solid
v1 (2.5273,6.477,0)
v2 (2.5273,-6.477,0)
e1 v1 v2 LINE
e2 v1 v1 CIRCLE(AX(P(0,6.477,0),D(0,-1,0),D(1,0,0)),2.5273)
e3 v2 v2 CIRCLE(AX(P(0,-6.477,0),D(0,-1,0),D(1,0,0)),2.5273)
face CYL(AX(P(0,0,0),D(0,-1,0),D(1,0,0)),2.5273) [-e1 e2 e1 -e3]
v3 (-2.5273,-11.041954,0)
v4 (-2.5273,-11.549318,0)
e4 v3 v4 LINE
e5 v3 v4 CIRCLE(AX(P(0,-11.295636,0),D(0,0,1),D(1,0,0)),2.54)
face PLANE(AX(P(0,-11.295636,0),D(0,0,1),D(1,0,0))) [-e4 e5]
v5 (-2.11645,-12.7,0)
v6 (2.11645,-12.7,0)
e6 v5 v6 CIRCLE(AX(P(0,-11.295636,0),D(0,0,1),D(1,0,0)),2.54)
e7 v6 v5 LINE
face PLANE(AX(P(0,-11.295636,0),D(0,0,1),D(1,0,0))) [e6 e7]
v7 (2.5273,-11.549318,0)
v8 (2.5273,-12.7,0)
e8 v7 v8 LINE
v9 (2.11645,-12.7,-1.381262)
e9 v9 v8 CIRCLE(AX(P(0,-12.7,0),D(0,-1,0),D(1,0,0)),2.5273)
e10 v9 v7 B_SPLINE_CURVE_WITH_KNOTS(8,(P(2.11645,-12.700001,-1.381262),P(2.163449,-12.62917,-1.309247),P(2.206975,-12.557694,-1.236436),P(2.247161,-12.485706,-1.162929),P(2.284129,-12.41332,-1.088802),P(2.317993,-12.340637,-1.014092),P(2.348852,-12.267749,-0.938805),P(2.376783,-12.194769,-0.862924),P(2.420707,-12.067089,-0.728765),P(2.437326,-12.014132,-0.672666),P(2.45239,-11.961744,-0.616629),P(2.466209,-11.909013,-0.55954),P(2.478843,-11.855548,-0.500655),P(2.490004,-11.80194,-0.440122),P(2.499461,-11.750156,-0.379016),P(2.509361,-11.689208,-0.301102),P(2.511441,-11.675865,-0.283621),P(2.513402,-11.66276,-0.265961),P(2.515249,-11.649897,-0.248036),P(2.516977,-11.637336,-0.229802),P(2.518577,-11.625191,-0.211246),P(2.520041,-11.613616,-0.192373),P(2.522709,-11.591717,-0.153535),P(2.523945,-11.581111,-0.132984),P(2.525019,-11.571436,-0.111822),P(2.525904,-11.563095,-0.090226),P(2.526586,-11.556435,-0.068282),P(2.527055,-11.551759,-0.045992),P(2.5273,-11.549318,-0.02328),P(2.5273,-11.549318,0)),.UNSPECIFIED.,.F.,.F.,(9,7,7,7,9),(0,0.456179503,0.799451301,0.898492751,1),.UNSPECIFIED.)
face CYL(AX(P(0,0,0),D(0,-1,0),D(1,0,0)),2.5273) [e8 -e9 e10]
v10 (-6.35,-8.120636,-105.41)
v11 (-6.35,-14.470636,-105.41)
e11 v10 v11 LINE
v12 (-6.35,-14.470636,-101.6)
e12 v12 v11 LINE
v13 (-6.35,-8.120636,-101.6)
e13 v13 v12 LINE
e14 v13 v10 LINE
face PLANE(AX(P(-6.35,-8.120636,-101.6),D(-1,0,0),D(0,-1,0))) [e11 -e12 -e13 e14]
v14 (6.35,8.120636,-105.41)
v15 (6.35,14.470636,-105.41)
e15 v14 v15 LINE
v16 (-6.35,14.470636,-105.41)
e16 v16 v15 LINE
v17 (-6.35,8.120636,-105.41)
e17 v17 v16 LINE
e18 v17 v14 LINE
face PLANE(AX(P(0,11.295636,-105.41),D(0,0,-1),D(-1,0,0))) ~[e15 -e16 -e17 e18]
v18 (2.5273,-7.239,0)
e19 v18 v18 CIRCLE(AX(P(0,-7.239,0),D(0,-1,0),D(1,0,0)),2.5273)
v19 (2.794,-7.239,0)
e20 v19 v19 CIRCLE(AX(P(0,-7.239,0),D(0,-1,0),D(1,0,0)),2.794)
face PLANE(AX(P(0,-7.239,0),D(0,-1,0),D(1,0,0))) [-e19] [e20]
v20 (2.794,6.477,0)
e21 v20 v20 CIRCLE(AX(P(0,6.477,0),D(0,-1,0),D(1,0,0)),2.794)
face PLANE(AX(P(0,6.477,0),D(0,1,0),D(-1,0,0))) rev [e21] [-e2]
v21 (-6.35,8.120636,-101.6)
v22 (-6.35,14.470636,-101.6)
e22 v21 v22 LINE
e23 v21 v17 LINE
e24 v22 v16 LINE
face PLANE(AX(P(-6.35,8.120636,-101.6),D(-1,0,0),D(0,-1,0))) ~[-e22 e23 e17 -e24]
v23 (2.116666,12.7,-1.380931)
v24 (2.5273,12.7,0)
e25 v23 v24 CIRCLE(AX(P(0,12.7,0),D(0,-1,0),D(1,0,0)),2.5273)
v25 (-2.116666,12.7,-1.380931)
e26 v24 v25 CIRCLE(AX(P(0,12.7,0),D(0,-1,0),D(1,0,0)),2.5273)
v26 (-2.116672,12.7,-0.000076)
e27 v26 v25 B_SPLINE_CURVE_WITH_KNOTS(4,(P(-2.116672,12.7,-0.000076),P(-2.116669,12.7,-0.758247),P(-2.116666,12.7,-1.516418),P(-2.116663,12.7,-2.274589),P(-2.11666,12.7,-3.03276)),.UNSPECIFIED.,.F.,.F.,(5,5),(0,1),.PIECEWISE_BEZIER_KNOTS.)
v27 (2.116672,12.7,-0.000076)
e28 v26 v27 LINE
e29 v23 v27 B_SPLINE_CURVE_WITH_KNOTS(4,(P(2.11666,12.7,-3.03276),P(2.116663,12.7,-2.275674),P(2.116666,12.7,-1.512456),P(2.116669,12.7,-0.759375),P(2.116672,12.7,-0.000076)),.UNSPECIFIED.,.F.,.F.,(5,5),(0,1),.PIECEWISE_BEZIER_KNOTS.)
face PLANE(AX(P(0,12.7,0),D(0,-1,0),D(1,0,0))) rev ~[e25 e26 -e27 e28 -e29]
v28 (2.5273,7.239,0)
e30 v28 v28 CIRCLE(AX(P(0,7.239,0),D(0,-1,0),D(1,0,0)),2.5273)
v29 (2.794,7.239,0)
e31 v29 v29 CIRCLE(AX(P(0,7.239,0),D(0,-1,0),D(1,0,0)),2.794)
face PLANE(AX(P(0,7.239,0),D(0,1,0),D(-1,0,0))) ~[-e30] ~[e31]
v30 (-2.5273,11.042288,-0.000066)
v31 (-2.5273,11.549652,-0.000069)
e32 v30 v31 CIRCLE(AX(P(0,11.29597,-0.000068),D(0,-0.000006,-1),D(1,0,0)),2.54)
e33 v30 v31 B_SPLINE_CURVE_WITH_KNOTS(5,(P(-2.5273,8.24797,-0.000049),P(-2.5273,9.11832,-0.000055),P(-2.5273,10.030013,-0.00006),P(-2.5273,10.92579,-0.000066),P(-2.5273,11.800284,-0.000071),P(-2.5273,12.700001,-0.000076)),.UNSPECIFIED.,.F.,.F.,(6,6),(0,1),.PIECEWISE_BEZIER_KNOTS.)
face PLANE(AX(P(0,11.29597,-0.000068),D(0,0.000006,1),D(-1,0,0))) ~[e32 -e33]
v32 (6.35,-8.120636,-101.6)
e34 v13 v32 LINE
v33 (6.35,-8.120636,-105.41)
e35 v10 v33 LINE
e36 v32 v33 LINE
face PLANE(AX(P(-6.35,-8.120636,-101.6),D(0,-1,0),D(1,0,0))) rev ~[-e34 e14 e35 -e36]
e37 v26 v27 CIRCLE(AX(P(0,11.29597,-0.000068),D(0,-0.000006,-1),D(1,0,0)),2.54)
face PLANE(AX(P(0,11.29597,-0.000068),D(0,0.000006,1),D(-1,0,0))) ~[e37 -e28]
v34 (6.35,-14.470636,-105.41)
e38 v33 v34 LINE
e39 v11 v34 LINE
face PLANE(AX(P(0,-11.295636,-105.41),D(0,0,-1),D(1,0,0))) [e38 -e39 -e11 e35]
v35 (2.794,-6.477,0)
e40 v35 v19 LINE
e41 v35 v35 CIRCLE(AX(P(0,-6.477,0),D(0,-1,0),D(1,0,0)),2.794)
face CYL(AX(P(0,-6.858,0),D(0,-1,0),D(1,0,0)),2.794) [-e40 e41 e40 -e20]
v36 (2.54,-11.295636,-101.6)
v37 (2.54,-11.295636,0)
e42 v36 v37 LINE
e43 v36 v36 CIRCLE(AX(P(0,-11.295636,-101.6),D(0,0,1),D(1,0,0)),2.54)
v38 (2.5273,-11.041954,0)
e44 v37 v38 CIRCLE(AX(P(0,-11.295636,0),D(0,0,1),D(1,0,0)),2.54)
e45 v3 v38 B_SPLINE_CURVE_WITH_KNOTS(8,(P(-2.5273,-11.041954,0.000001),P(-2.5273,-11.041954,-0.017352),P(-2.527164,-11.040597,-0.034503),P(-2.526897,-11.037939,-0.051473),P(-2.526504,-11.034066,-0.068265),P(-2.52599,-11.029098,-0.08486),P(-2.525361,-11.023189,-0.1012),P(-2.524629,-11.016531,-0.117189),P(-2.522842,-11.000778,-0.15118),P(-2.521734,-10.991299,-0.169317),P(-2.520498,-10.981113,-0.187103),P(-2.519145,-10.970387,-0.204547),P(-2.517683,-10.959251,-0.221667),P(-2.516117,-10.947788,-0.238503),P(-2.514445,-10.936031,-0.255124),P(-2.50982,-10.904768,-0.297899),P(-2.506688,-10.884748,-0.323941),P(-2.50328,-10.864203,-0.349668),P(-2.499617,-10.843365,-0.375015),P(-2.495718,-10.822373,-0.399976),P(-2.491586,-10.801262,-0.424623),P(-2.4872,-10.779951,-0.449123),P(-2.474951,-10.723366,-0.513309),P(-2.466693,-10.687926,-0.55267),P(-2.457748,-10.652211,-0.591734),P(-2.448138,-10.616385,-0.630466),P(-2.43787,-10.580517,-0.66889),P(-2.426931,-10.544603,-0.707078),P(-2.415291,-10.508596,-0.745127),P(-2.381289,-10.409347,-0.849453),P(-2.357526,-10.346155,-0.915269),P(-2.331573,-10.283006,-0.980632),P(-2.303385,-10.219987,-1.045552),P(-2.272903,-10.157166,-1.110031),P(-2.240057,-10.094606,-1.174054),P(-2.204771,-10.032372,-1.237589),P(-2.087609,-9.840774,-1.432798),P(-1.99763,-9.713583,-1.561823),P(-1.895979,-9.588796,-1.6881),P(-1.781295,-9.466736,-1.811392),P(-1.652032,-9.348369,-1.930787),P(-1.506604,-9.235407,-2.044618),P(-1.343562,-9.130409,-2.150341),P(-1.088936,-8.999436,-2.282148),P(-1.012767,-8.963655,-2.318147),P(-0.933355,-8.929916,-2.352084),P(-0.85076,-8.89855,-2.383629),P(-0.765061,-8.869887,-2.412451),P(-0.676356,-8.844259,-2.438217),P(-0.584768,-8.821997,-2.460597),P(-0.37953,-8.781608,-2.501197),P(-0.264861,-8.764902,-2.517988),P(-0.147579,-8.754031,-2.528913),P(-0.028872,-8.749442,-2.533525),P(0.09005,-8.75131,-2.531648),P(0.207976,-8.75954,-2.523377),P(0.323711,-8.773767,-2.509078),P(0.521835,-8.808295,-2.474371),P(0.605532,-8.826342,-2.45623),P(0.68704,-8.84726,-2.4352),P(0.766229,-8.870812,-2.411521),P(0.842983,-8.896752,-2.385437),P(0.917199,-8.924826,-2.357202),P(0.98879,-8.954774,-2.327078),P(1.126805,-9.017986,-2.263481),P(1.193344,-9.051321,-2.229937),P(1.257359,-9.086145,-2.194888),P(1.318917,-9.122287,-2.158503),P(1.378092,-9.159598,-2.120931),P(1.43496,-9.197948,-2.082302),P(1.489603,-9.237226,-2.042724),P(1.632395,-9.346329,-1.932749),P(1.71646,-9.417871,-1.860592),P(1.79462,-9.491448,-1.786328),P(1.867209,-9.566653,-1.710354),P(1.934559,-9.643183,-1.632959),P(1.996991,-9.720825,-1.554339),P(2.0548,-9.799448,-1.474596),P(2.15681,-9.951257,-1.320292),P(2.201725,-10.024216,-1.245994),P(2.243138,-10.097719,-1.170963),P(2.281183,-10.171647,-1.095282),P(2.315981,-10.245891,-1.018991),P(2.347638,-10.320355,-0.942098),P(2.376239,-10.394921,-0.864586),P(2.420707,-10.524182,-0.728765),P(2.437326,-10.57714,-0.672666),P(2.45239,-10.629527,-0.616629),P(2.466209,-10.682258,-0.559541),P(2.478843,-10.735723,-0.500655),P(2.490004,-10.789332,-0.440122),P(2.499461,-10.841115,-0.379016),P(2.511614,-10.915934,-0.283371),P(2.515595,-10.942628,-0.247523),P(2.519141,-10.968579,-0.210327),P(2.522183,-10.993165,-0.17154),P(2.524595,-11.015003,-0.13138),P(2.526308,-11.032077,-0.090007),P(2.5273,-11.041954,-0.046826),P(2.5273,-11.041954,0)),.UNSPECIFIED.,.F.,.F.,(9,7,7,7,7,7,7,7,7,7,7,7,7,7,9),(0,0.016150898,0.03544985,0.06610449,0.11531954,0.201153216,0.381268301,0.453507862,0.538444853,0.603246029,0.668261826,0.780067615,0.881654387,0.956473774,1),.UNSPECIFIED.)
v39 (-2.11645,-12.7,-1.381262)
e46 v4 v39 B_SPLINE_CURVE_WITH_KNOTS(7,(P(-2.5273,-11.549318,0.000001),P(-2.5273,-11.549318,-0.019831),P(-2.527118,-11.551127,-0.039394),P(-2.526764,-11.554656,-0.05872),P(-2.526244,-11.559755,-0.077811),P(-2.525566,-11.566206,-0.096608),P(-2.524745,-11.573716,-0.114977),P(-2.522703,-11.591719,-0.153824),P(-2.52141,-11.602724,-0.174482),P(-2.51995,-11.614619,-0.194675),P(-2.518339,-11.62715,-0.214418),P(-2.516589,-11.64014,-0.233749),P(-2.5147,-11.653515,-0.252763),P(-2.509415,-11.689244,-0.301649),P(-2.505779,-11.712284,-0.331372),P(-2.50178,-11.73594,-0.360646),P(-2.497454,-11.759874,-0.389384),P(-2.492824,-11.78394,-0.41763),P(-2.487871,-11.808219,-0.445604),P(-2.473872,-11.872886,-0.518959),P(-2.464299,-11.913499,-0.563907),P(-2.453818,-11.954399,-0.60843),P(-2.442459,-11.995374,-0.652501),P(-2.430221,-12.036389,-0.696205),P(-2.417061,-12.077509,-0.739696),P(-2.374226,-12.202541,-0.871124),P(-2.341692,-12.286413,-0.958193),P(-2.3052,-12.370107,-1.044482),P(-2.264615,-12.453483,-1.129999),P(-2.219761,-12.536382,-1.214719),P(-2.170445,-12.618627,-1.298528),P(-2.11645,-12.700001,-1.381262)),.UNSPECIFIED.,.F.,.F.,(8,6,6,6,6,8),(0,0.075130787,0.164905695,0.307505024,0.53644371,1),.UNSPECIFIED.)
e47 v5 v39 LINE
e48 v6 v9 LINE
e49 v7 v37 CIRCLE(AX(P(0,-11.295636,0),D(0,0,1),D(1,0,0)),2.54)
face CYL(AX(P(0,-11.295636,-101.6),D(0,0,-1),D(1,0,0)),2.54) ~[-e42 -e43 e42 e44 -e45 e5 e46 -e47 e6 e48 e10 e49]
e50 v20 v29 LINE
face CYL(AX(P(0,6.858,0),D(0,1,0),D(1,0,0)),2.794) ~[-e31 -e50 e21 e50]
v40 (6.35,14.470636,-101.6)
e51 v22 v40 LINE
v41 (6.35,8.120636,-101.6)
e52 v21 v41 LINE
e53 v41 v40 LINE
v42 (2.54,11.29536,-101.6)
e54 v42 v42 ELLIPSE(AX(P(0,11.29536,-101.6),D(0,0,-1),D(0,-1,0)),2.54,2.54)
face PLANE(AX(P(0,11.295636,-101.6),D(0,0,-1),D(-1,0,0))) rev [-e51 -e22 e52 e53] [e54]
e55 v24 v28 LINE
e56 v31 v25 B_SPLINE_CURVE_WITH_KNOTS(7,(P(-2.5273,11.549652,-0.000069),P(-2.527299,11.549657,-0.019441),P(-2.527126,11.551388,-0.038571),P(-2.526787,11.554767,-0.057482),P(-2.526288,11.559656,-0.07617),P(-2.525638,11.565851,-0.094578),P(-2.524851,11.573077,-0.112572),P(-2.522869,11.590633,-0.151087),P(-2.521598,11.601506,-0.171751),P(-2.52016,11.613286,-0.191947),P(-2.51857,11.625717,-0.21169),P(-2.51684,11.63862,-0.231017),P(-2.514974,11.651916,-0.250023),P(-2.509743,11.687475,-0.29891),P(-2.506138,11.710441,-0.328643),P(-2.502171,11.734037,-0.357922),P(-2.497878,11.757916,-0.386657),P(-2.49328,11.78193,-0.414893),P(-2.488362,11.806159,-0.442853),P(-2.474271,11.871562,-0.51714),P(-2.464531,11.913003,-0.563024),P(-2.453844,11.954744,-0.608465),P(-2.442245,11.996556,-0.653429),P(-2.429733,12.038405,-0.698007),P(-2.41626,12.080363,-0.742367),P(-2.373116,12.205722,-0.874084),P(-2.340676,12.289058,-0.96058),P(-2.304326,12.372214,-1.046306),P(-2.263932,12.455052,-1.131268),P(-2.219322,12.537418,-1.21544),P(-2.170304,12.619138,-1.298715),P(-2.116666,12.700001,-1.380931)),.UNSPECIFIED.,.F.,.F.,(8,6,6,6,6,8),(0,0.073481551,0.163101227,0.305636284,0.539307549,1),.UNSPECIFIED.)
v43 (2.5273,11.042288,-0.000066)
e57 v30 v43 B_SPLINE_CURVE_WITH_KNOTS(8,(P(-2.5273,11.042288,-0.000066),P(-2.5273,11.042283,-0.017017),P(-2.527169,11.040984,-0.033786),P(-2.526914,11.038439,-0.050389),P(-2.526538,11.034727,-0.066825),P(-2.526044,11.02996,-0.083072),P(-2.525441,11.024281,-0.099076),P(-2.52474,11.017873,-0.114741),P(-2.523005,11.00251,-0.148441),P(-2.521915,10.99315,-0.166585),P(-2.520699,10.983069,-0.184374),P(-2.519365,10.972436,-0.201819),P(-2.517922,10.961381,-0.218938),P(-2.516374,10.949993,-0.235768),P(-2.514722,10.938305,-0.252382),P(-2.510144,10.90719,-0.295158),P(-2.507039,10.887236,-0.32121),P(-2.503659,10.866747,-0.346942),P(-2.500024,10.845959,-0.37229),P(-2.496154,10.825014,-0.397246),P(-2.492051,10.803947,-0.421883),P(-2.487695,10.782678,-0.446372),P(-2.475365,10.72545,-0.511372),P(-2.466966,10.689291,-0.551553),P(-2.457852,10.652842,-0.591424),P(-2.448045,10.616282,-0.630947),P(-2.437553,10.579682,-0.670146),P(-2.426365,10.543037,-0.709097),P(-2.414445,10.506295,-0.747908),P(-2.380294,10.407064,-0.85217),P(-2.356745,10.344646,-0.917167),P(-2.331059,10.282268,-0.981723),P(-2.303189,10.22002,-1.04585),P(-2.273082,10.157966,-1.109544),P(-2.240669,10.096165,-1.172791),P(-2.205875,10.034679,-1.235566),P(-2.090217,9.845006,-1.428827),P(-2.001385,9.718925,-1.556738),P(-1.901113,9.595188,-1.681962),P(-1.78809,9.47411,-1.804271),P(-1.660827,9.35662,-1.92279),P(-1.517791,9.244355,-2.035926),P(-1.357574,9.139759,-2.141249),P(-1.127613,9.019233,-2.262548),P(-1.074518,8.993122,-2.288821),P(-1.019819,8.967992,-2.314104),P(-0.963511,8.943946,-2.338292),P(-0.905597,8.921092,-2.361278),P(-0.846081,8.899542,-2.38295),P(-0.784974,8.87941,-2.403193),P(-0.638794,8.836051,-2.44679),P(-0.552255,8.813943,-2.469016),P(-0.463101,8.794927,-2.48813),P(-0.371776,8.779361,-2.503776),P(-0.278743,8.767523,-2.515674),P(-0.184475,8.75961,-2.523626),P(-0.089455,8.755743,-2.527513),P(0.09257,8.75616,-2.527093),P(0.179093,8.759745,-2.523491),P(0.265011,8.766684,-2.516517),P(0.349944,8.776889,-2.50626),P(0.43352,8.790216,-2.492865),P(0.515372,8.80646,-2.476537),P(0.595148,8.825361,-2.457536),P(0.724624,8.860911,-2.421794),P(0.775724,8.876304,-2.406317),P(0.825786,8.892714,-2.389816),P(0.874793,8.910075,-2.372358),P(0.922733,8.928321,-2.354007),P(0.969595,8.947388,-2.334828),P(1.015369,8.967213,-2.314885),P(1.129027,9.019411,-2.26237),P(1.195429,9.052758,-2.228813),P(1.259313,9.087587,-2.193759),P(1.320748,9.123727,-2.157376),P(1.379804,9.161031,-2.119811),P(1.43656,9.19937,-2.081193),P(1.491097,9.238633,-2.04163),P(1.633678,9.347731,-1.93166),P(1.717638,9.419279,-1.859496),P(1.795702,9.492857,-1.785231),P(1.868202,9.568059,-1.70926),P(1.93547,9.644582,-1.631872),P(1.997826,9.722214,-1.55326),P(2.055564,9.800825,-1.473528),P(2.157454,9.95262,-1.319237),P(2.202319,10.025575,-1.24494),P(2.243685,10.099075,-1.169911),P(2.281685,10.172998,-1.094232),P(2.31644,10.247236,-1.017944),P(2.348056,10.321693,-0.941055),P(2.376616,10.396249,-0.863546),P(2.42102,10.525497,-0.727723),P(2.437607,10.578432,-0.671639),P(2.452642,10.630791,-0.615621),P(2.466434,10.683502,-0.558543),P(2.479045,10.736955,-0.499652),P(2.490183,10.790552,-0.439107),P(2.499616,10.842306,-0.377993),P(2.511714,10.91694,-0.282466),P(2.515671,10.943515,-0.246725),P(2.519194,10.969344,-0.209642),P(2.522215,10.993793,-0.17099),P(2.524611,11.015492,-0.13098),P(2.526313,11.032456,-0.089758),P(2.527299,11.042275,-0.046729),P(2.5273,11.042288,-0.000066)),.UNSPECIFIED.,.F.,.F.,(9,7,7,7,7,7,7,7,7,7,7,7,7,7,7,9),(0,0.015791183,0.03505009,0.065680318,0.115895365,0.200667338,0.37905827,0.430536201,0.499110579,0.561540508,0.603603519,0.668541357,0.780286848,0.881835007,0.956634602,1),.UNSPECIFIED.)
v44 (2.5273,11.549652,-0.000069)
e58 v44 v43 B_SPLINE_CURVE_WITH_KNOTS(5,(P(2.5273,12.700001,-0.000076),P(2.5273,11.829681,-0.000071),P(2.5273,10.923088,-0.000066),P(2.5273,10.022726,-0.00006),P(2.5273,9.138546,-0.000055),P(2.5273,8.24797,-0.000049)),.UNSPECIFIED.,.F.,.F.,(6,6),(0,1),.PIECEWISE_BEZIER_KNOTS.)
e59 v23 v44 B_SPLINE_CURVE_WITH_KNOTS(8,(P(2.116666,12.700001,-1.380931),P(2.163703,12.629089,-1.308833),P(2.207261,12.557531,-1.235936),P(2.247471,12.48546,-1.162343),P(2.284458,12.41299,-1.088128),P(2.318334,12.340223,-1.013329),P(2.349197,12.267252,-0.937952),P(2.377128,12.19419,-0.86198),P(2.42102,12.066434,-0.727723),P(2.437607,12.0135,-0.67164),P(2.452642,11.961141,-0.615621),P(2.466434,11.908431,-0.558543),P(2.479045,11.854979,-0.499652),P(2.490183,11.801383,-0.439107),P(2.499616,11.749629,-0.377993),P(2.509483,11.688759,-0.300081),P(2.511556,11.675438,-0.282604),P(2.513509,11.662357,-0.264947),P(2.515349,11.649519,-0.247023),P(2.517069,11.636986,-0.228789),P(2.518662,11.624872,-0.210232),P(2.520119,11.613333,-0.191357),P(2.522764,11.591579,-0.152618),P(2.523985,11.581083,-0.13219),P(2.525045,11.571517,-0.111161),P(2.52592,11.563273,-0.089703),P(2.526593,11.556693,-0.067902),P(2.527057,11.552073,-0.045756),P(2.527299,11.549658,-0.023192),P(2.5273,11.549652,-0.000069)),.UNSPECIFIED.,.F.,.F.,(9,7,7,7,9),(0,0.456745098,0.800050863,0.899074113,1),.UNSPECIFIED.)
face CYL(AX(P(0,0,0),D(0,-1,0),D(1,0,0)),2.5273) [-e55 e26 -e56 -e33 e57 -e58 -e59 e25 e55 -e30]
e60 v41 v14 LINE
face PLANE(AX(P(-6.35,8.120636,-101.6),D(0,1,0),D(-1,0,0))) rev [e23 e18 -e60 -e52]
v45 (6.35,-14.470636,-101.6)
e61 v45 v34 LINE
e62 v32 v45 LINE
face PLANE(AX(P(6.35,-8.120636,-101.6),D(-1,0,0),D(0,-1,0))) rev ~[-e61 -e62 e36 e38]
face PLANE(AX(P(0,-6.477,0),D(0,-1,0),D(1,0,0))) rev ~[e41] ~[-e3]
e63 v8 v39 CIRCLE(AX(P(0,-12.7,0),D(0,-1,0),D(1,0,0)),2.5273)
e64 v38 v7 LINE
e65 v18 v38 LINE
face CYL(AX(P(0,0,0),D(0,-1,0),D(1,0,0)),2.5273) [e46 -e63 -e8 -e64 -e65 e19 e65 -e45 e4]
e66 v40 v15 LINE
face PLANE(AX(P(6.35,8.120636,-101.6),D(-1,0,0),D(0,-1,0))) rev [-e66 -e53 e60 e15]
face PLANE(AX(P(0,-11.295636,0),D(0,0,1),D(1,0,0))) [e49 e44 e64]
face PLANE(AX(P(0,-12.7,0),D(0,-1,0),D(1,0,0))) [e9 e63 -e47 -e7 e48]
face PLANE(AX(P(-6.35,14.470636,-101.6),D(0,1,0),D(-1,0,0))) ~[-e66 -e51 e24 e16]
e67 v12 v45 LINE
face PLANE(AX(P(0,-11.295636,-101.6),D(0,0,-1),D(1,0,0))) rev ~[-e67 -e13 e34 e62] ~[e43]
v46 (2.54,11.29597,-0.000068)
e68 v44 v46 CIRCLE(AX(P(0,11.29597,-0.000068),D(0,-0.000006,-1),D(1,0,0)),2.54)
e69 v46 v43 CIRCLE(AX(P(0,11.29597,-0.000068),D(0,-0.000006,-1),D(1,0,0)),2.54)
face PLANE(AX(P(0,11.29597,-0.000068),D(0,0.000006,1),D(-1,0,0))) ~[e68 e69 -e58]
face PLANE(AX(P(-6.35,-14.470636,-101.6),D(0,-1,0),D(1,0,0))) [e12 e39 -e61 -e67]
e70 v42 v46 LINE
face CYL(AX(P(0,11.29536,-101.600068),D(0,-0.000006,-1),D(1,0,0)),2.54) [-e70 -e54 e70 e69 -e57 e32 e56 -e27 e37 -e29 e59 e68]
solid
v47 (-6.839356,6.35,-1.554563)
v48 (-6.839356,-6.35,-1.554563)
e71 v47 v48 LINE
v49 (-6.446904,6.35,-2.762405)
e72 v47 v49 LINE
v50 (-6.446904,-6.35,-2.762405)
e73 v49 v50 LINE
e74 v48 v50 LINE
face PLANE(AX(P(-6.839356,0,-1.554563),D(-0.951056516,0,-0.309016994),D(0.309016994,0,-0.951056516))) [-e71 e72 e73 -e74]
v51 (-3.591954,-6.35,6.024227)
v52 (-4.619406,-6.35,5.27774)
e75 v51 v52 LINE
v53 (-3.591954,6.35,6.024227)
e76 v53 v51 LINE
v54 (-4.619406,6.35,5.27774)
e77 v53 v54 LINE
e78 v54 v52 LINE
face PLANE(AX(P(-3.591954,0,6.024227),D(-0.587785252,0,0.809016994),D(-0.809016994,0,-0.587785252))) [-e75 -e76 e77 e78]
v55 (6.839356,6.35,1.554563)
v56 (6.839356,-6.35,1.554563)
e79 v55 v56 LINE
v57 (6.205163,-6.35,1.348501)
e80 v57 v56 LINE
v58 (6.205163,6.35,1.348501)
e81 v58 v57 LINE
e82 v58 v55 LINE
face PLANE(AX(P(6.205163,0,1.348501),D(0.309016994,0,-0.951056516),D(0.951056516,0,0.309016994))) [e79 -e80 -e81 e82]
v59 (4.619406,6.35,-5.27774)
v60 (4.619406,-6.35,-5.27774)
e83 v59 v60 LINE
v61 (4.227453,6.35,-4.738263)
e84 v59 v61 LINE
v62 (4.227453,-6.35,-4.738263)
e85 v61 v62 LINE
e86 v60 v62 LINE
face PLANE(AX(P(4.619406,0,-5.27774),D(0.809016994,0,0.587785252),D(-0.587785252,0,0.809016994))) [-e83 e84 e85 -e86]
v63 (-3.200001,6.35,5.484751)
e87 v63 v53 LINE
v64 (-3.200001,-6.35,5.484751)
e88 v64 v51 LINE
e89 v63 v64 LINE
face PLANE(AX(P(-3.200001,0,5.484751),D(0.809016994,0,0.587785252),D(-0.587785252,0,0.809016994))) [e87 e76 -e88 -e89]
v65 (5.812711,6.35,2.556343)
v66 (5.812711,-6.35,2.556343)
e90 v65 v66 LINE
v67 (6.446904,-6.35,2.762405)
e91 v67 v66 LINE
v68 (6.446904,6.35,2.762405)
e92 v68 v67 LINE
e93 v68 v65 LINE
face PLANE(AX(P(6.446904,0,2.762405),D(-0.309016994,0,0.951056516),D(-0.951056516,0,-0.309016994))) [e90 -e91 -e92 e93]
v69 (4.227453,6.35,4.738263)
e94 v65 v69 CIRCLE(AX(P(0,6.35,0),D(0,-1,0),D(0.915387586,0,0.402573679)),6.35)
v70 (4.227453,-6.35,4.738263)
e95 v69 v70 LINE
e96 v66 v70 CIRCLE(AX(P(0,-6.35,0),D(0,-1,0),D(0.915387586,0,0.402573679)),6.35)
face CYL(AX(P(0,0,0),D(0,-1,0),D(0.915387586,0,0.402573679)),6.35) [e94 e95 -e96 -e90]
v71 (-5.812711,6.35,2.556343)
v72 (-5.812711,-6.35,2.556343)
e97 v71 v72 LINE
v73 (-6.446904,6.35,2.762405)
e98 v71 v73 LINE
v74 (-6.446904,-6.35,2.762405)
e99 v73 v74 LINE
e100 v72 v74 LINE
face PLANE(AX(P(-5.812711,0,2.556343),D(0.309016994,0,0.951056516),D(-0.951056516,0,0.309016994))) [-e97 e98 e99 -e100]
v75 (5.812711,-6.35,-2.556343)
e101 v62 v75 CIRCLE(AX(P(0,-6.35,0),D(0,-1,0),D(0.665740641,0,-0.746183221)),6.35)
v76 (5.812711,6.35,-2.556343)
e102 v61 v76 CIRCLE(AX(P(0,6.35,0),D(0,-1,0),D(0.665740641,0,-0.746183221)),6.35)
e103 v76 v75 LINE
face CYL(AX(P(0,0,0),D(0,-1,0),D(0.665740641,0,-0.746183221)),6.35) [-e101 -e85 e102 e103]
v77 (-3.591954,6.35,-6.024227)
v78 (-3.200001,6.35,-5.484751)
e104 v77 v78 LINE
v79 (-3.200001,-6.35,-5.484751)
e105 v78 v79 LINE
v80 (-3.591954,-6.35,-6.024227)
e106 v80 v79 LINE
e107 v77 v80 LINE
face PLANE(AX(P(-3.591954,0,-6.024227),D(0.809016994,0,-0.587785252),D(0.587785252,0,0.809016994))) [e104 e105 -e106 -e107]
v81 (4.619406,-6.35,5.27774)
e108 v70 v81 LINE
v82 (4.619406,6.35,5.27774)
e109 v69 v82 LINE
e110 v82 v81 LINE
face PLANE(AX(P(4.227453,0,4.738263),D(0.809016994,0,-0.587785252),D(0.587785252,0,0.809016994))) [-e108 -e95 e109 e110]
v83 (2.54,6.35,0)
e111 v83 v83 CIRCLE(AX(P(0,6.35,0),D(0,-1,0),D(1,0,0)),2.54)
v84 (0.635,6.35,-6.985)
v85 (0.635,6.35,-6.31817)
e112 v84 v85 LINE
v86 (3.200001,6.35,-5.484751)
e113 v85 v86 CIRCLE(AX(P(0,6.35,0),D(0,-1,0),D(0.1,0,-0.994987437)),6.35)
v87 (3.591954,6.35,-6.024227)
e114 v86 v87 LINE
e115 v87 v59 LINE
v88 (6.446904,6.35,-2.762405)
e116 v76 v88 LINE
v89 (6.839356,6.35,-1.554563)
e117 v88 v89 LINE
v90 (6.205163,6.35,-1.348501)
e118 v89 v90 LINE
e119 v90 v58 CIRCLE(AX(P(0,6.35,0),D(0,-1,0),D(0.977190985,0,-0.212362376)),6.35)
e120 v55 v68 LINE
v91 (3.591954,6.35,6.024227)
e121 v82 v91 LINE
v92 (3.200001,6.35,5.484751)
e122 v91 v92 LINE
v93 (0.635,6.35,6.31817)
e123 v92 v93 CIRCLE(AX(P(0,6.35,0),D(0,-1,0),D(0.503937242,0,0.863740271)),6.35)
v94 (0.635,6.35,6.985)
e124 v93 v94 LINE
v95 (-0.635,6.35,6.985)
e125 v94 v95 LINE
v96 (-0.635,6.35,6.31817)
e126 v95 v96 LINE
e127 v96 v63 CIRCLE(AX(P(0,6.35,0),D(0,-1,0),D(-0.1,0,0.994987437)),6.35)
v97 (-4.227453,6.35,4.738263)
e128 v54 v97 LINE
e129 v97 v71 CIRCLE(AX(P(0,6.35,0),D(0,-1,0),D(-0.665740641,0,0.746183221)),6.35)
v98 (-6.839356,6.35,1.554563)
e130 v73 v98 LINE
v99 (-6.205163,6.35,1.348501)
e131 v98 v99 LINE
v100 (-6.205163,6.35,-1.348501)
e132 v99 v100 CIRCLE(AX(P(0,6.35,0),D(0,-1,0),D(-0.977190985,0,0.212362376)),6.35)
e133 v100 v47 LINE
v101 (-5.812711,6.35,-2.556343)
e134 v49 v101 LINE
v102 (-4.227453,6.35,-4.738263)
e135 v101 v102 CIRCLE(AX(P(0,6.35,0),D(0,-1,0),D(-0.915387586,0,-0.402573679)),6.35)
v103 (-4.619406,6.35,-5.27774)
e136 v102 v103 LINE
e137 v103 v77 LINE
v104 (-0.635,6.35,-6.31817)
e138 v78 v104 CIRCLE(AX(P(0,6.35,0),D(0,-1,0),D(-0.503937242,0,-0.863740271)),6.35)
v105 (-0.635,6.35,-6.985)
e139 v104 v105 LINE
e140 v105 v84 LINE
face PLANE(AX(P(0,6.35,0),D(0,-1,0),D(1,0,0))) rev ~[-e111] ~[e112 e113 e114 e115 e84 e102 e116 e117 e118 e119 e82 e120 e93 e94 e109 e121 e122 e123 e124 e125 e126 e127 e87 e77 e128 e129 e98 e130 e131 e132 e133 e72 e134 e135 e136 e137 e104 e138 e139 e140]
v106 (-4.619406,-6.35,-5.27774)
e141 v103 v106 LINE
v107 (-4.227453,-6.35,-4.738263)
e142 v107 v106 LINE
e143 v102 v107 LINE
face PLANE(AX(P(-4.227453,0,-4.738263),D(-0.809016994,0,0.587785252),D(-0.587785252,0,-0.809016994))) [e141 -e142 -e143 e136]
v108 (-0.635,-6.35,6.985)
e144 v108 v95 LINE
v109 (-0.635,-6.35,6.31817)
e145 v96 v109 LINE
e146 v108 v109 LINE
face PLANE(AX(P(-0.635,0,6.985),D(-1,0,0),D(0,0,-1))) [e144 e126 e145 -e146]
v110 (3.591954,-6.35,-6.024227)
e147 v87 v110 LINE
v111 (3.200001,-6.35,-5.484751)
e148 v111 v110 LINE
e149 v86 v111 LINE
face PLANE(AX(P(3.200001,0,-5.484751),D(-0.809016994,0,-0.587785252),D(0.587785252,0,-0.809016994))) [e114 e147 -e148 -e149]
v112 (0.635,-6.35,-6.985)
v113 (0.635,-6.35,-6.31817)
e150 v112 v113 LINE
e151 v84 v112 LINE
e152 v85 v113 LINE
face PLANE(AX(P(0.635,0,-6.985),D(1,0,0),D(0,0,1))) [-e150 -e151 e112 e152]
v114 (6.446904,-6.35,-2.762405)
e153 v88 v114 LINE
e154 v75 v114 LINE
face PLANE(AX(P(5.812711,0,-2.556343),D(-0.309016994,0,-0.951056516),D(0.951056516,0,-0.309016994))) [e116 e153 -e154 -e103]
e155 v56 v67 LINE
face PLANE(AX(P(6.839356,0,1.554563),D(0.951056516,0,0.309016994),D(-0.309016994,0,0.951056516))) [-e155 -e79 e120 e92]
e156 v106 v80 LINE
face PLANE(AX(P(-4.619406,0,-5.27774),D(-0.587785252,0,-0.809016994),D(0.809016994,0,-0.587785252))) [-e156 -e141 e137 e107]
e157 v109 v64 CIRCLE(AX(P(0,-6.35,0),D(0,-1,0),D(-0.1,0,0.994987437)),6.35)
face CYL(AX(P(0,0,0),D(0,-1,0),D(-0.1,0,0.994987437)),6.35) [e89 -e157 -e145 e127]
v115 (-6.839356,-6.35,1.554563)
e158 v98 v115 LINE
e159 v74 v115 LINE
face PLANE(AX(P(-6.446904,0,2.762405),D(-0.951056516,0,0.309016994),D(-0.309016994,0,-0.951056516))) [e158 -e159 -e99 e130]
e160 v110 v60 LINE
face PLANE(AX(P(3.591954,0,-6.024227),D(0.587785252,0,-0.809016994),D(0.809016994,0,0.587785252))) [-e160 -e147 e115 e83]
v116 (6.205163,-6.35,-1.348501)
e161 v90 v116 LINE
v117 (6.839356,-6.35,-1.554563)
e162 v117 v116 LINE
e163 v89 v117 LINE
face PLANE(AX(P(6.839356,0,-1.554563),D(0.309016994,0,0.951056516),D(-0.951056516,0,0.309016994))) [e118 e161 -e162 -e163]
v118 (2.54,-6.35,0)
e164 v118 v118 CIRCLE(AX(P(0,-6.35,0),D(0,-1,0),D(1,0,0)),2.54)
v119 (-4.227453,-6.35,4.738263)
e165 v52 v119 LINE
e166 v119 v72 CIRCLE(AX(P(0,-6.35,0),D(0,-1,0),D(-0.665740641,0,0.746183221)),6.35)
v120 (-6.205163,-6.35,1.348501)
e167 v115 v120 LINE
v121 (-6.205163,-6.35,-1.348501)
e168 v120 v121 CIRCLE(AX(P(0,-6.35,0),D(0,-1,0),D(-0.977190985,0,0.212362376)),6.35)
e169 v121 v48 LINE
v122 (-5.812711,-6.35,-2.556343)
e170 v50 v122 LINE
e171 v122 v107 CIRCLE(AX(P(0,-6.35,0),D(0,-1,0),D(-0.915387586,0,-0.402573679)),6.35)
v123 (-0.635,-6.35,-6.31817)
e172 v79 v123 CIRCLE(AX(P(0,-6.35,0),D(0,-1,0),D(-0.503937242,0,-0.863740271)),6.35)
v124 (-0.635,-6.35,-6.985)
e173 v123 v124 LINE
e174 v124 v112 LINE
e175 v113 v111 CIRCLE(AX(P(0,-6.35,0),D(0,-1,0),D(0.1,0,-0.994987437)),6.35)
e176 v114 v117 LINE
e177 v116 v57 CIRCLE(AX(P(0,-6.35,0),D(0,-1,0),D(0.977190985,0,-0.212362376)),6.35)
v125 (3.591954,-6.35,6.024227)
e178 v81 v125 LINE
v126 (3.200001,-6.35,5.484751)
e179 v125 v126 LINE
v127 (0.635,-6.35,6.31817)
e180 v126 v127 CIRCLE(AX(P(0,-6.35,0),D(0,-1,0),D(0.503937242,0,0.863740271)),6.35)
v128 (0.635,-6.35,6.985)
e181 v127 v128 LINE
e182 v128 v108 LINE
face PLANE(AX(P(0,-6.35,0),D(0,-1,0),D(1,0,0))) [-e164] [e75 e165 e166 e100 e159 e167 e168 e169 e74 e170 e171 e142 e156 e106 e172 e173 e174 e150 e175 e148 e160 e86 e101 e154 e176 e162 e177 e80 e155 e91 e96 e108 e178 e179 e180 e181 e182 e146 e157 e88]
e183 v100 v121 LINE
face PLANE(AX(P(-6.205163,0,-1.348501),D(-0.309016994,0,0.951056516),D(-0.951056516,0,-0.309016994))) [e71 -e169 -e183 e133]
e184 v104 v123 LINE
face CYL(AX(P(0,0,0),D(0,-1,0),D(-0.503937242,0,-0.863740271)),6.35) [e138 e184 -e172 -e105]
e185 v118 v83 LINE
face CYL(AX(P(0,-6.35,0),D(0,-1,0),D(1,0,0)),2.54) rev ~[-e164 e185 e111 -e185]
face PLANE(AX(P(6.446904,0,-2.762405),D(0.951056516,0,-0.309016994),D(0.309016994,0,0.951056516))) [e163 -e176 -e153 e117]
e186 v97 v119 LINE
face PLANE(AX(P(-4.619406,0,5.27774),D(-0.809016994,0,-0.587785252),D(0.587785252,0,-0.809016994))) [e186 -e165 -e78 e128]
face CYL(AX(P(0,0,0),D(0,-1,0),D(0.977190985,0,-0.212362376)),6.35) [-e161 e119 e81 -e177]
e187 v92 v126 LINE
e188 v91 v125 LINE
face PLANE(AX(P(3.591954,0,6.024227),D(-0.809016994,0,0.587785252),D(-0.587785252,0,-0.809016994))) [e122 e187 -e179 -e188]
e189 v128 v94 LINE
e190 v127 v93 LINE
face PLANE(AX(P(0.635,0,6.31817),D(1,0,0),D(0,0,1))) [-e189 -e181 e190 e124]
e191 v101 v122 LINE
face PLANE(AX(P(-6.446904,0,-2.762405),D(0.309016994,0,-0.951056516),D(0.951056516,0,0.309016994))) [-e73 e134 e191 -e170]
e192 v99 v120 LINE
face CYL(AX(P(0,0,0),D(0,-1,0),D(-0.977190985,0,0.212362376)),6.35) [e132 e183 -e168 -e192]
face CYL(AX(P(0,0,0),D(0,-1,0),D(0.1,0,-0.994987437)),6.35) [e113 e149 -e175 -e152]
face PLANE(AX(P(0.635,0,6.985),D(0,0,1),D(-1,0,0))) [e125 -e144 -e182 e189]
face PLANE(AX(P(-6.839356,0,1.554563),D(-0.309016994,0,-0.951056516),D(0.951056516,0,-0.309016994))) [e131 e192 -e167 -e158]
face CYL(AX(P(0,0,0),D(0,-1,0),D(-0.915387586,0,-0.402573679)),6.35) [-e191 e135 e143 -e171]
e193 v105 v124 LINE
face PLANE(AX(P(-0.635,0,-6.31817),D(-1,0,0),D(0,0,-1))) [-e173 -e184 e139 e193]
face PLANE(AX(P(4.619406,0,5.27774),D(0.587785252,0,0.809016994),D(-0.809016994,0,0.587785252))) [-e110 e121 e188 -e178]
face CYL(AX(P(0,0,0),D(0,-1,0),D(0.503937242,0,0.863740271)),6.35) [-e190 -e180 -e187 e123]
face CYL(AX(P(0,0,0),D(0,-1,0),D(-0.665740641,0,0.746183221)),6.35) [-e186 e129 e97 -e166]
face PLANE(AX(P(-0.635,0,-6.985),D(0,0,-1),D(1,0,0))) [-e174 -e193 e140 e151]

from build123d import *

# Parameters (mm, degrees)
F1_DEPTH  = 6.35
F2_R      = 2.54
F3_DEPTH  = 25.4
F4_R      = 2.5273
F5_DEPTH  = 12.7
F7_R      = 2.794
F8_DEPTH  = 0.381
F10_R     = 2.54
F11_DEPTH = 101.6
F12_W     = 12.7
F12_H     = 6.35
F13_DEPTH = 3.81


# Not quite as in the source:
# - a pattern or mirror of a feature is missing from the dataset's text; its kind, count and spacing are read off the source's solid


with BuildPart() as f1:
    # F0 (on Front) → F1 (new body, symmetric)
    with BuildSketch(Plane.XZ):
        with BuildLine():
            Line((-0.635, 6.985), (-0.635, 6.3181702256))
            ThreePointArc((-0.635, 6.3181702256), (-1.9622579143, 6.0392088785), (-3.2000014887, 5.4847507211))
            Line((-3.2000014887, 5.4847507211), (-3.5919541958, 6.0242273409))
            Line((-3.5919541958, 6.0242273409), (-4.6194057787, 5.2777400705))
            Line((-4.6194057787, 5.2777400705), (-4.2274530715, 4.7382634507))
            ThreePointArc((-4.2274530715, 4.7382634507), (-5.1372579143, 3.7324363521), (-5.8127111727, 2.5563428609))
            Line((-5.8127111727, 2.5563428609), (-6.4469039749, 2.7624045936))
            Line((-6.4469039749, 2.7624045936), (-6.8393555577, 1.5545628179))
            Line((-6.8393555577, 1.5545628179), (-6.2051627556, 1.3485010852))
            ThreePointArc((-6.2051627556, 1.3485010852), (-6.35, 0), (-6.2051627556, -1.3485010852))
            Line((-6.2051627556, -1.3485010852), (-6.8393555577, -1.5545628179))
            Line((-6.8393555577, -1.5545628179), (-6.4469039749, -2.7624045936))
            Line((-6.4469039749, -2.7624045936), (-5.8127111727, -2.5563428609))
            ThreePointArc((-5.8127111727, -2.5563428609), (-5.1372579143, -3.7324363521), (-4.2274530715, -4.7382634507))
            Line((-4.2274530715, -4.7382634507), (-4.6194057787, -5.2777400705))
            Line((-4.6194057787, -5.2777400705), (-3.5919541958, -6.0242273409))
            Line((-3.5919541958, -6.0242273409), (-3.2000014887, -5.4847507211))
            ThreePointArc((-3.2000014887, -5.4847507211), (-1.9622579143, -6.0392088785), (-0.635, -6.3181702256))
            Line((-0.635, -6.3181702256), (-0.635, -6.985))
            Line((-0.635, -6.985), (0.635, -6.985))
            Line((0.635, -6.985), (0.635, -6.3181702256))
            ThreePointArc((0.635, -6.3181702256), (1.9622579143, -6.0392088785), (3.2000014887, -5.4847507211))
            Line((3.2000014887, -5.4847507211), (3.5919541958, -6.0242273409))
            Line((3.5919541958, -6.0242273409), (4.6194057787, -5.2777400705))
            Line((4.6194057787, -5.2777400705), (4.2274530715, -4.7382634507))
            ThreePointArc((4.2274530715, -4.7382634507), (5.1372579143, -3.7324363521), (5.8127111727, -2.5563428609))
            Line((5.8127111727, -2.5563428609), (6.4469039749, -2.7624045936))
            Line((6.4469039749, -2.7624045936), (6.8393555577, -1.5545628179))
            Line((6.8393555577, -1.5545628179), (6.2051627556, -1.3485010852))
            ThreePointArc((6.2051627556, -1.3485010852), (6.35, 0), (6.2051627556, 1.3485010852))
            Line((6.2051627556, 1.3485010852), (6.8393555577, 1.5545628179))
            Line((6.8393555577, 1.5545628179), (6.4469039749, 2.7624045936))
            Line((6.4469039749, 2.7624045936), (5.8127111727, 2.5563428609))
            ThreePointArc((5.8127111727, 2.5563428609), (5.1372579143, 3.7324363521), (4.2274530715, 4.7382634507))
            Line((4.2274530715, 4.7382634507), (4.6194057787, 5.2777400705))
            Line((4.6194057787, 5.2777400705), (3.5919541958, 6.0242273409))
            Line((3.5919541958, 6.0242273409), (3.2000014887, 5.4847507211))
            ThreePointArc((3.2000014887, 5.4847507211), (1.9622579143, 6.0392088785), (0.635, 6.3181702256))
            Line((0.635, 6.3181702256), (0.635, 6.985))
            Line((0.635, 6.985), (-0.635, 6.985))
        make_face()
    extrude(amount=F1_DEPTH, both=True)

    # F2 (on face) → F3 (cut)
    with BuildSketch(Plane.XZ.offset(6.35)):
        Circle(F2_R)
    extrude(amount=-F3_DEPTH, mode=Mode.SUBTRACT)


with BuildPart() as f5:
    # F4 (on Front) → F5 (new body, symmetric)
    with BuildSketch(Plane.XZ):
        Circle(F4_R)
    extrude(amount=F5_DEPTH, both=True)

    # F7 (on offset) → F8 (join, symmetric)
    with BuildSketch(Plane.XZ.offset(6.858)):
        Circle(F7_R)
    f8 = extrude(amount=F8_DEPTH, both=True)

    # F8_copies: F8 across plane
    add(f8.mirror(Plane.ZX))

    # F10 (on offset) → F11 (join)
    with BuildSketch(Plane.XY.offset(-101.6)):
        with Locations((0, -11.2956358868)):
            Circle(F10_R)
    f11 = extrude(amount=F11_DEPTH)

    # F11_copies: F11 across plane
    add(f11.mirror(Plane(origin=(0, 0.000167, 0), x_dir=(0, 3e-06, 1), z_dir=(0, 1, -3e-06))))

    # F12 (on face) → F13 (join)
    with BuildSketch(Plane(origin=(0, 0, -101.6), x_dir=(1, 0, 0), z_dir=(0, 0, -1))):
        with Locations((0, 11.2956358868)):
            Rectangle(F12_W, F12_H)
    f13 = extrude(amount=F13_DEPTH)

    # F13_copies: F13 across plane
    add(f13.mirror(Plane.ZX))


solid = Compound([f1.part, f5.part])
